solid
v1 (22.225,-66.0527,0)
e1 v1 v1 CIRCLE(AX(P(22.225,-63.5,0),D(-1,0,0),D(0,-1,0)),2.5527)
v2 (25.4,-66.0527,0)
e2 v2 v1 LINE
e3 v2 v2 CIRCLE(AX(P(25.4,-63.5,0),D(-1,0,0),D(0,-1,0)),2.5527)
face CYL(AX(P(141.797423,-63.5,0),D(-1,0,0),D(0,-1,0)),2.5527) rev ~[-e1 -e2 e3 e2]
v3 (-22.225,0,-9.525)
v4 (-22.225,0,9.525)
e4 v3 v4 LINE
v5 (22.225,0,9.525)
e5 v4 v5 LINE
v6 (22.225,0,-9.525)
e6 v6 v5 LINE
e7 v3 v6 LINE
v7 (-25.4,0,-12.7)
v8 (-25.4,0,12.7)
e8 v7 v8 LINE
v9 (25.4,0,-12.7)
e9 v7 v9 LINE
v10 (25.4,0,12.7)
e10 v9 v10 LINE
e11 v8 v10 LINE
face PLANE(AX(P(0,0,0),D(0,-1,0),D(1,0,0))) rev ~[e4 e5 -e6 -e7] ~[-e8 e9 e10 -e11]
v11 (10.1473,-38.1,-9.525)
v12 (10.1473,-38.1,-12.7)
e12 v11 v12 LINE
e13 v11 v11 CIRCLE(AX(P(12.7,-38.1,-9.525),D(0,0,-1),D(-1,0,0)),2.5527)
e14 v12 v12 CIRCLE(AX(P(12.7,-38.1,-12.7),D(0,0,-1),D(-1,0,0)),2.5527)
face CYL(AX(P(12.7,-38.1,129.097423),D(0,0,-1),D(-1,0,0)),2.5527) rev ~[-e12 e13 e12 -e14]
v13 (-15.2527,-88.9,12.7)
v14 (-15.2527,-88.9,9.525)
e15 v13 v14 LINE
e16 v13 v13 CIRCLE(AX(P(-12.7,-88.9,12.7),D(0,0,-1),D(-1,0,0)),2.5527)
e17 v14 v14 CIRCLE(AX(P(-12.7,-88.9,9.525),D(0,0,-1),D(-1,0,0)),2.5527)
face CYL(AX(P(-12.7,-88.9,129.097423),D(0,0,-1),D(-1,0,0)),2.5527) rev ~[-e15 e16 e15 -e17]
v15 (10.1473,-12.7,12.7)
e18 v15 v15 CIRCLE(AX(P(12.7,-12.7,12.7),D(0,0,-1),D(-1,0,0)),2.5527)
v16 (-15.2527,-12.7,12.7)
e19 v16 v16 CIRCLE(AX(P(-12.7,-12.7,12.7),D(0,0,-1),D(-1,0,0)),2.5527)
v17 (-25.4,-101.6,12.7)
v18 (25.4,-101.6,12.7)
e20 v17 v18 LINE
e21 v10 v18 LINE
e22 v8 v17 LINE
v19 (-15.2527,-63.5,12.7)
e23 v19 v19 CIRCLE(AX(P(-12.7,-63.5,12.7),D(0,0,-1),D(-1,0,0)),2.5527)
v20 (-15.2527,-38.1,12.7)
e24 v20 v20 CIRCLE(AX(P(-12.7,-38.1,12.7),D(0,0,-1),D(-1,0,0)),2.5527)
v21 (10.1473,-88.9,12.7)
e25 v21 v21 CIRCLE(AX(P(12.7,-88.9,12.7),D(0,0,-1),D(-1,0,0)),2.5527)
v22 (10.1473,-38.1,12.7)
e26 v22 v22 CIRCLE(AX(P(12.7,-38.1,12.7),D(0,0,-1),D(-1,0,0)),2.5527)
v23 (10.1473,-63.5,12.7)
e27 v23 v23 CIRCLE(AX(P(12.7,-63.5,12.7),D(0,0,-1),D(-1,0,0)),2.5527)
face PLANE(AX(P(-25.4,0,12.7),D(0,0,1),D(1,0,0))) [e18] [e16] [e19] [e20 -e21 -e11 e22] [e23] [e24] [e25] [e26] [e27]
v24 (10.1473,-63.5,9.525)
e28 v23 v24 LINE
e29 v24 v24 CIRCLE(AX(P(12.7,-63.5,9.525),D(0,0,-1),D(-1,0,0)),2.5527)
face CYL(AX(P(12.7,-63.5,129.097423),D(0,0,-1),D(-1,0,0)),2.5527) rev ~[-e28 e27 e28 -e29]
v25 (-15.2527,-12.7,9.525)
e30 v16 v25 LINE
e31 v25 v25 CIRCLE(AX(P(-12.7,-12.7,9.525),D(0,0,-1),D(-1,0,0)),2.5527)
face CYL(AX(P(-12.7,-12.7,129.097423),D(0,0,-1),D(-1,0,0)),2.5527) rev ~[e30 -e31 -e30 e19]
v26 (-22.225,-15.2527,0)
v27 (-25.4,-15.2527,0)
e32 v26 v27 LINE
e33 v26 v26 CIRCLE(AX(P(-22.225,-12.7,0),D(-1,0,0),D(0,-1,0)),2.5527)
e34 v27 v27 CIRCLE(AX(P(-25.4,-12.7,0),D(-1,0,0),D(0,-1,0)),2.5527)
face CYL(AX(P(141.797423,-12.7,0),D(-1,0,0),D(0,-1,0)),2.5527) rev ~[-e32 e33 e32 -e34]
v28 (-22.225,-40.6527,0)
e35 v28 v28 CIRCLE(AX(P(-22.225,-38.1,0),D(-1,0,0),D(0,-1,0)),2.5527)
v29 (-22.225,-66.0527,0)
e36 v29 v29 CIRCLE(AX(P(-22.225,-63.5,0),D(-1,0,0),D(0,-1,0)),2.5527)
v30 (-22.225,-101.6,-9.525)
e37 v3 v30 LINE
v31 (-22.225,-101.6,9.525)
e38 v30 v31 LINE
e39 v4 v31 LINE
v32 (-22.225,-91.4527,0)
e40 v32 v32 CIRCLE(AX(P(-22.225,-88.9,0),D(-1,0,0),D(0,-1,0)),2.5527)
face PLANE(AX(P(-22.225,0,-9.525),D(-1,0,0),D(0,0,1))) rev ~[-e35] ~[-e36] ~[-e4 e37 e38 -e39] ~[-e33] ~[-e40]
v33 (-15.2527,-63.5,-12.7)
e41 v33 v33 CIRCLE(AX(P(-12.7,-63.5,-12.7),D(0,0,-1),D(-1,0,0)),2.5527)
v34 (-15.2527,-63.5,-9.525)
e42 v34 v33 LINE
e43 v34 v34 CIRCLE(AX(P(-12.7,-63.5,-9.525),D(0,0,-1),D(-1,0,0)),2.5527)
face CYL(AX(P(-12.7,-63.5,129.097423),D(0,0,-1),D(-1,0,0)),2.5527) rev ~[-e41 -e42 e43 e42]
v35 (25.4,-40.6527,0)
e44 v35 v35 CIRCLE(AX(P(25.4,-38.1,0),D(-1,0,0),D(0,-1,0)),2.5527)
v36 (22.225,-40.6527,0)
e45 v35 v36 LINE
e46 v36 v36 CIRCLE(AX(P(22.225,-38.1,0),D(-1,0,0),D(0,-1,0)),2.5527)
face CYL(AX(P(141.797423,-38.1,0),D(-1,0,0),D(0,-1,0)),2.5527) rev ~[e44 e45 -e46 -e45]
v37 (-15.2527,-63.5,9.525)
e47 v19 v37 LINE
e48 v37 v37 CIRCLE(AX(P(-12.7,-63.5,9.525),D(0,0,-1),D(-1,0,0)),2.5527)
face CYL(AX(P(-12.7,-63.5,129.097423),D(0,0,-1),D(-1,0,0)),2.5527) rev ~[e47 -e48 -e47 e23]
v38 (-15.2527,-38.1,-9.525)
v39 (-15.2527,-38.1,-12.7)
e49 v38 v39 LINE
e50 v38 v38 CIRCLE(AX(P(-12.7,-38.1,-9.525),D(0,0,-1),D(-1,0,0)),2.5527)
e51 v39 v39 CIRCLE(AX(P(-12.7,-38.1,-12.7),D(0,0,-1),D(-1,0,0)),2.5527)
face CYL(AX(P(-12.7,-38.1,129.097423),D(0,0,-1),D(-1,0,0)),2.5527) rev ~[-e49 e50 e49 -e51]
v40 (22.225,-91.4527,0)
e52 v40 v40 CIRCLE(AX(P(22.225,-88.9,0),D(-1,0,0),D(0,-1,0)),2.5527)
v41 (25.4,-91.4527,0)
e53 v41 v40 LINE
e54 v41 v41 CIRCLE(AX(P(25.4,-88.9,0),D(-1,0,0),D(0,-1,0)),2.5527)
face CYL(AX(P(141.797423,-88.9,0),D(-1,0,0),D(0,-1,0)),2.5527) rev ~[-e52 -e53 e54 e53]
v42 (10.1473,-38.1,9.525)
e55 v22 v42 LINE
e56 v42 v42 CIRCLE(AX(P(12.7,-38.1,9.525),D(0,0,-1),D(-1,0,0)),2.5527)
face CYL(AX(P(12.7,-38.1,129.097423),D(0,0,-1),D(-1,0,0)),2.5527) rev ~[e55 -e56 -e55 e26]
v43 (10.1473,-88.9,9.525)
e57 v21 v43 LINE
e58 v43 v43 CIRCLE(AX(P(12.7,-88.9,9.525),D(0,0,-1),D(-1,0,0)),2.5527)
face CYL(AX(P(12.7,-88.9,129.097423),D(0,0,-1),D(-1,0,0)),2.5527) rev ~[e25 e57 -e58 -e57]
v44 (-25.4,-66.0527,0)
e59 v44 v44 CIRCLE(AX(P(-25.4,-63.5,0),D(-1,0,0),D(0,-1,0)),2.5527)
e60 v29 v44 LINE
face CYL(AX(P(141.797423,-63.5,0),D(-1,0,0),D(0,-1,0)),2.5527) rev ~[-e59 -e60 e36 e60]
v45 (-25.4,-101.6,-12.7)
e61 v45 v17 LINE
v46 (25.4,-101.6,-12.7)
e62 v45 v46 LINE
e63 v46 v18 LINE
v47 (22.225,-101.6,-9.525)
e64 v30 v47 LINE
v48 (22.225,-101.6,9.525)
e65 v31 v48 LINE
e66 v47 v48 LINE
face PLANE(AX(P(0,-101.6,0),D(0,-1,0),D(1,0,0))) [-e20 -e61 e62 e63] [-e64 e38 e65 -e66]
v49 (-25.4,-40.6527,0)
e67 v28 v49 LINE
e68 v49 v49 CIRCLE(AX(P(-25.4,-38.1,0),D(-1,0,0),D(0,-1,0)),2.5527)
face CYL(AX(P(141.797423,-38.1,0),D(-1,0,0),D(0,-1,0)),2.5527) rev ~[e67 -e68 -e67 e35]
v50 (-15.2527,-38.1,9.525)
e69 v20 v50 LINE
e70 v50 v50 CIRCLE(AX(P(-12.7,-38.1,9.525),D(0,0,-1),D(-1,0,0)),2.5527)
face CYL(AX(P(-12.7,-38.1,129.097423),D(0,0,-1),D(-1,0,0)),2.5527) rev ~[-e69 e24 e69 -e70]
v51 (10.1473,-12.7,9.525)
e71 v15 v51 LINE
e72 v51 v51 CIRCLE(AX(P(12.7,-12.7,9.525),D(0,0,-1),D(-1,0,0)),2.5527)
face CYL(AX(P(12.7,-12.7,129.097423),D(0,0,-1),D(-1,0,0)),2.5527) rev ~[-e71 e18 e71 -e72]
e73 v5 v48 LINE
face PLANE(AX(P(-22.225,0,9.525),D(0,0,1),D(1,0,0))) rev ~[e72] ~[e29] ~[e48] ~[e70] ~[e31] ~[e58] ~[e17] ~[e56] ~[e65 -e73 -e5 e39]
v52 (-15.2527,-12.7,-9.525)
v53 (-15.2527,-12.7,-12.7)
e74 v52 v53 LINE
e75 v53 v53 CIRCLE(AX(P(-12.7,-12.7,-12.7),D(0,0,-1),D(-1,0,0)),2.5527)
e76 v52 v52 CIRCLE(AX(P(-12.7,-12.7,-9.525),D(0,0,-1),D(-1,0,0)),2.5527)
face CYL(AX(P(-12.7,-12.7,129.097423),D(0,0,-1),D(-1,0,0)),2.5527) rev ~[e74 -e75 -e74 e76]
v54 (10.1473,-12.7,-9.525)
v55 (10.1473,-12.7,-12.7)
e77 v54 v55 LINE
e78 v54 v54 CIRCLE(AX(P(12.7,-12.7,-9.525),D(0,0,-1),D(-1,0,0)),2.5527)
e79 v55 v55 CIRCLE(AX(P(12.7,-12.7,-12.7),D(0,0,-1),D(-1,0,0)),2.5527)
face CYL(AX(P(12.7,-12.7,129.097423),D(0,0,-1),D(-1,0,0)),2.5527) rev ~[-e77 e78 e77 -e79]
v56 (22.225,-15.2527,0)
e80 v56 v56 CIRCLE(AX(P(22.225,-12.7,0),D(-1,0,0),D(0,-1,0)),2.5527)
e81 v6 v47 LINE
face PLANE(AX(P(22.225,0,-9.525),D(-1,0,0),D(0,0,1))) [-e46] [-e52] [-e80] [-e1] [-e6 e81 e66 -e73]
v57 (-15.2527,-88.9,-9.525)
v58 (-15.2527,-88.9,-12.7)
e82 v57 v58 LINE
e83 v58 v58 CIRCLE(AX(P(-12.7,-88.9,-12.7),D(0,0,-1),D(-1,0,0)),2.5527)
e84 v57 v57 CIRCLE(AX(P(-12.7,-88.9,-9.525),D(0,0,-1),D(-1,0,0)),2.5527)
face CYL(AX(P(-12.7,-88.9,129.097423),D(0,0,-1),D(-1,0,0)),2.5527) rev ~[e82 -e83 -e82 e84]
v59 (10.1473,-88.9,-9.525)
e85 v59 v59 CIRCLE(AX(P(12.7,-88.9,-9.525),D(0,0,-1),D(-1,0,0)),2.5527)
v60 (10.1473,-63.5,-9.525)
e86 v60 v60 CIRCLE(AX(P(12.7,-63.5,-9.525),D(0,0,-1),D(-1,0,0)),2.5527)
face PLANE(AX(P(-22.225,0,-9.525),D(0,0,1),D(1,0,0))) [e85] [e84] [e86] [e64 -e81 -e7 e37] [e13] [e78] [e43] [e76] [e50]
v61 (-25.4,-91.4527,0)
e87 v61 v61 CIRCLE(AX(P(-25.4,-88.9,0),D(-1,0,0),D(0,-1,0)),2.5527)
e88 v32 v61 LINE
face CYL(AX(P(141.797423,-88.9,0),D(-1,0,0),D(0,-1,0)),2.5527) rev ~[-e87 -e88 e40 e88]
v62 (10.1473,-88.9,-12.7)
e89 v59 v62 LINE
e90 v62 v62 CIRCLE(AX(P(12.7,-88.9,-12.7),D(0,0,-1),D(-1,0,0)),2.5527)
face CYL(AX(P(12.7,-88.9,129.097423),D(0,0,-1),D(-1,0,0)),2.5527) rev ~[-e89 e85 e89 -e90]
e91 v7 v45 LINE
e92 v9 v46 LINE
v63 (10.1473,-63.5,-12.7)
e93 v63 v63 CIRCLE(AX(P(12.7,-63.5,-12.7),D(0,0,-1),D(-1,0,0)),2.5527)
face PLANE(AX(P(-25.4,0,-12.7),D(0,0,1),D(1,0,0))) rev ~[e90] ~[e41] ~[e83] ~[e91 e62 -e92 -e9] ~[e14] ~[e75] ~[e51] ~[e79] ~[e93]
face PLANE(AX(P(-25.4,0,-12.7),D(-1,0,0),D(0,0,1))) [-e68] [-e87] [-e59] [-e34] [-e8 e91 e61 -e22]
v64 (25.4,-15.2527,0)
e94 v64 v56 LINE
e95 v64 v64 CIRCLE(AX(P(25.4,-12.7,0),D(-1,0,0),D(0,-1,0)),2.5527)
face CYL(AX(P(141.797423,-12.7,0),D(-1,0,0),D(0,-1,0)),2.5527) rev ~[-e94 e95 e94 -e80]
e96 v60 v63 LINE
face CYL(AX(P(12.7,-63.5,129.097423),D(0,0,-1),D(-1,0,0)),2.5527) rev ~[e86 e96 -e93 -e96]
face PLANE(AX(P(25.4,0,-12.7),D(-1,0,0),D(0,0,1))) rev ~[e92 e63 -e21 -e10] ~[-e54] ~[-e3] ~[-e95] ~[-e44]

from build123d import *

# Parameters (mm, degrees)
F0_W     = 50.8
F0_H     = 25.4
F0_W_2   = 44.45
F0_H_2   = 19.05
F1_DEPTH = 101.6
F3_D     = 5.1054
F5_D     = 5.1054


# Not quite as in the source:
# - a feature names something its author has since deleted; it is built from what else it names


with BuildPart() as f1:
    # F0 (on Front) → F1 (new body)
    with BuildSketch(Plane.XZ):
        Rectangle(F0_W, F0_H)
        Rectangle(F0_W_2, F0_H_2, mode=Mode.SUBTRACT)
    extrude(amount=F1_DEPTH)

    # F3 (through all)
    with Locations(Plane.XY.offset(12.7)):
        with Locations((-12.7, -88.9), (-12.7, -12.7), (-12.7, -38.1), (-12.7, -63.5), (12.7, -12.7), (12.7, -88.9), (12.7, -38.1), (12.7, -63.5)):
            Hole(F3_D / 2)

    # F5 (through all)
    with Locations(Plane.YZ.offset(25.4)):
        with Locations((-88.9, 0), (-63.5, 0), (-38.1, 0), (-12.7, 0)):
            Hole(F5_D / 2)


solid = f1.part
